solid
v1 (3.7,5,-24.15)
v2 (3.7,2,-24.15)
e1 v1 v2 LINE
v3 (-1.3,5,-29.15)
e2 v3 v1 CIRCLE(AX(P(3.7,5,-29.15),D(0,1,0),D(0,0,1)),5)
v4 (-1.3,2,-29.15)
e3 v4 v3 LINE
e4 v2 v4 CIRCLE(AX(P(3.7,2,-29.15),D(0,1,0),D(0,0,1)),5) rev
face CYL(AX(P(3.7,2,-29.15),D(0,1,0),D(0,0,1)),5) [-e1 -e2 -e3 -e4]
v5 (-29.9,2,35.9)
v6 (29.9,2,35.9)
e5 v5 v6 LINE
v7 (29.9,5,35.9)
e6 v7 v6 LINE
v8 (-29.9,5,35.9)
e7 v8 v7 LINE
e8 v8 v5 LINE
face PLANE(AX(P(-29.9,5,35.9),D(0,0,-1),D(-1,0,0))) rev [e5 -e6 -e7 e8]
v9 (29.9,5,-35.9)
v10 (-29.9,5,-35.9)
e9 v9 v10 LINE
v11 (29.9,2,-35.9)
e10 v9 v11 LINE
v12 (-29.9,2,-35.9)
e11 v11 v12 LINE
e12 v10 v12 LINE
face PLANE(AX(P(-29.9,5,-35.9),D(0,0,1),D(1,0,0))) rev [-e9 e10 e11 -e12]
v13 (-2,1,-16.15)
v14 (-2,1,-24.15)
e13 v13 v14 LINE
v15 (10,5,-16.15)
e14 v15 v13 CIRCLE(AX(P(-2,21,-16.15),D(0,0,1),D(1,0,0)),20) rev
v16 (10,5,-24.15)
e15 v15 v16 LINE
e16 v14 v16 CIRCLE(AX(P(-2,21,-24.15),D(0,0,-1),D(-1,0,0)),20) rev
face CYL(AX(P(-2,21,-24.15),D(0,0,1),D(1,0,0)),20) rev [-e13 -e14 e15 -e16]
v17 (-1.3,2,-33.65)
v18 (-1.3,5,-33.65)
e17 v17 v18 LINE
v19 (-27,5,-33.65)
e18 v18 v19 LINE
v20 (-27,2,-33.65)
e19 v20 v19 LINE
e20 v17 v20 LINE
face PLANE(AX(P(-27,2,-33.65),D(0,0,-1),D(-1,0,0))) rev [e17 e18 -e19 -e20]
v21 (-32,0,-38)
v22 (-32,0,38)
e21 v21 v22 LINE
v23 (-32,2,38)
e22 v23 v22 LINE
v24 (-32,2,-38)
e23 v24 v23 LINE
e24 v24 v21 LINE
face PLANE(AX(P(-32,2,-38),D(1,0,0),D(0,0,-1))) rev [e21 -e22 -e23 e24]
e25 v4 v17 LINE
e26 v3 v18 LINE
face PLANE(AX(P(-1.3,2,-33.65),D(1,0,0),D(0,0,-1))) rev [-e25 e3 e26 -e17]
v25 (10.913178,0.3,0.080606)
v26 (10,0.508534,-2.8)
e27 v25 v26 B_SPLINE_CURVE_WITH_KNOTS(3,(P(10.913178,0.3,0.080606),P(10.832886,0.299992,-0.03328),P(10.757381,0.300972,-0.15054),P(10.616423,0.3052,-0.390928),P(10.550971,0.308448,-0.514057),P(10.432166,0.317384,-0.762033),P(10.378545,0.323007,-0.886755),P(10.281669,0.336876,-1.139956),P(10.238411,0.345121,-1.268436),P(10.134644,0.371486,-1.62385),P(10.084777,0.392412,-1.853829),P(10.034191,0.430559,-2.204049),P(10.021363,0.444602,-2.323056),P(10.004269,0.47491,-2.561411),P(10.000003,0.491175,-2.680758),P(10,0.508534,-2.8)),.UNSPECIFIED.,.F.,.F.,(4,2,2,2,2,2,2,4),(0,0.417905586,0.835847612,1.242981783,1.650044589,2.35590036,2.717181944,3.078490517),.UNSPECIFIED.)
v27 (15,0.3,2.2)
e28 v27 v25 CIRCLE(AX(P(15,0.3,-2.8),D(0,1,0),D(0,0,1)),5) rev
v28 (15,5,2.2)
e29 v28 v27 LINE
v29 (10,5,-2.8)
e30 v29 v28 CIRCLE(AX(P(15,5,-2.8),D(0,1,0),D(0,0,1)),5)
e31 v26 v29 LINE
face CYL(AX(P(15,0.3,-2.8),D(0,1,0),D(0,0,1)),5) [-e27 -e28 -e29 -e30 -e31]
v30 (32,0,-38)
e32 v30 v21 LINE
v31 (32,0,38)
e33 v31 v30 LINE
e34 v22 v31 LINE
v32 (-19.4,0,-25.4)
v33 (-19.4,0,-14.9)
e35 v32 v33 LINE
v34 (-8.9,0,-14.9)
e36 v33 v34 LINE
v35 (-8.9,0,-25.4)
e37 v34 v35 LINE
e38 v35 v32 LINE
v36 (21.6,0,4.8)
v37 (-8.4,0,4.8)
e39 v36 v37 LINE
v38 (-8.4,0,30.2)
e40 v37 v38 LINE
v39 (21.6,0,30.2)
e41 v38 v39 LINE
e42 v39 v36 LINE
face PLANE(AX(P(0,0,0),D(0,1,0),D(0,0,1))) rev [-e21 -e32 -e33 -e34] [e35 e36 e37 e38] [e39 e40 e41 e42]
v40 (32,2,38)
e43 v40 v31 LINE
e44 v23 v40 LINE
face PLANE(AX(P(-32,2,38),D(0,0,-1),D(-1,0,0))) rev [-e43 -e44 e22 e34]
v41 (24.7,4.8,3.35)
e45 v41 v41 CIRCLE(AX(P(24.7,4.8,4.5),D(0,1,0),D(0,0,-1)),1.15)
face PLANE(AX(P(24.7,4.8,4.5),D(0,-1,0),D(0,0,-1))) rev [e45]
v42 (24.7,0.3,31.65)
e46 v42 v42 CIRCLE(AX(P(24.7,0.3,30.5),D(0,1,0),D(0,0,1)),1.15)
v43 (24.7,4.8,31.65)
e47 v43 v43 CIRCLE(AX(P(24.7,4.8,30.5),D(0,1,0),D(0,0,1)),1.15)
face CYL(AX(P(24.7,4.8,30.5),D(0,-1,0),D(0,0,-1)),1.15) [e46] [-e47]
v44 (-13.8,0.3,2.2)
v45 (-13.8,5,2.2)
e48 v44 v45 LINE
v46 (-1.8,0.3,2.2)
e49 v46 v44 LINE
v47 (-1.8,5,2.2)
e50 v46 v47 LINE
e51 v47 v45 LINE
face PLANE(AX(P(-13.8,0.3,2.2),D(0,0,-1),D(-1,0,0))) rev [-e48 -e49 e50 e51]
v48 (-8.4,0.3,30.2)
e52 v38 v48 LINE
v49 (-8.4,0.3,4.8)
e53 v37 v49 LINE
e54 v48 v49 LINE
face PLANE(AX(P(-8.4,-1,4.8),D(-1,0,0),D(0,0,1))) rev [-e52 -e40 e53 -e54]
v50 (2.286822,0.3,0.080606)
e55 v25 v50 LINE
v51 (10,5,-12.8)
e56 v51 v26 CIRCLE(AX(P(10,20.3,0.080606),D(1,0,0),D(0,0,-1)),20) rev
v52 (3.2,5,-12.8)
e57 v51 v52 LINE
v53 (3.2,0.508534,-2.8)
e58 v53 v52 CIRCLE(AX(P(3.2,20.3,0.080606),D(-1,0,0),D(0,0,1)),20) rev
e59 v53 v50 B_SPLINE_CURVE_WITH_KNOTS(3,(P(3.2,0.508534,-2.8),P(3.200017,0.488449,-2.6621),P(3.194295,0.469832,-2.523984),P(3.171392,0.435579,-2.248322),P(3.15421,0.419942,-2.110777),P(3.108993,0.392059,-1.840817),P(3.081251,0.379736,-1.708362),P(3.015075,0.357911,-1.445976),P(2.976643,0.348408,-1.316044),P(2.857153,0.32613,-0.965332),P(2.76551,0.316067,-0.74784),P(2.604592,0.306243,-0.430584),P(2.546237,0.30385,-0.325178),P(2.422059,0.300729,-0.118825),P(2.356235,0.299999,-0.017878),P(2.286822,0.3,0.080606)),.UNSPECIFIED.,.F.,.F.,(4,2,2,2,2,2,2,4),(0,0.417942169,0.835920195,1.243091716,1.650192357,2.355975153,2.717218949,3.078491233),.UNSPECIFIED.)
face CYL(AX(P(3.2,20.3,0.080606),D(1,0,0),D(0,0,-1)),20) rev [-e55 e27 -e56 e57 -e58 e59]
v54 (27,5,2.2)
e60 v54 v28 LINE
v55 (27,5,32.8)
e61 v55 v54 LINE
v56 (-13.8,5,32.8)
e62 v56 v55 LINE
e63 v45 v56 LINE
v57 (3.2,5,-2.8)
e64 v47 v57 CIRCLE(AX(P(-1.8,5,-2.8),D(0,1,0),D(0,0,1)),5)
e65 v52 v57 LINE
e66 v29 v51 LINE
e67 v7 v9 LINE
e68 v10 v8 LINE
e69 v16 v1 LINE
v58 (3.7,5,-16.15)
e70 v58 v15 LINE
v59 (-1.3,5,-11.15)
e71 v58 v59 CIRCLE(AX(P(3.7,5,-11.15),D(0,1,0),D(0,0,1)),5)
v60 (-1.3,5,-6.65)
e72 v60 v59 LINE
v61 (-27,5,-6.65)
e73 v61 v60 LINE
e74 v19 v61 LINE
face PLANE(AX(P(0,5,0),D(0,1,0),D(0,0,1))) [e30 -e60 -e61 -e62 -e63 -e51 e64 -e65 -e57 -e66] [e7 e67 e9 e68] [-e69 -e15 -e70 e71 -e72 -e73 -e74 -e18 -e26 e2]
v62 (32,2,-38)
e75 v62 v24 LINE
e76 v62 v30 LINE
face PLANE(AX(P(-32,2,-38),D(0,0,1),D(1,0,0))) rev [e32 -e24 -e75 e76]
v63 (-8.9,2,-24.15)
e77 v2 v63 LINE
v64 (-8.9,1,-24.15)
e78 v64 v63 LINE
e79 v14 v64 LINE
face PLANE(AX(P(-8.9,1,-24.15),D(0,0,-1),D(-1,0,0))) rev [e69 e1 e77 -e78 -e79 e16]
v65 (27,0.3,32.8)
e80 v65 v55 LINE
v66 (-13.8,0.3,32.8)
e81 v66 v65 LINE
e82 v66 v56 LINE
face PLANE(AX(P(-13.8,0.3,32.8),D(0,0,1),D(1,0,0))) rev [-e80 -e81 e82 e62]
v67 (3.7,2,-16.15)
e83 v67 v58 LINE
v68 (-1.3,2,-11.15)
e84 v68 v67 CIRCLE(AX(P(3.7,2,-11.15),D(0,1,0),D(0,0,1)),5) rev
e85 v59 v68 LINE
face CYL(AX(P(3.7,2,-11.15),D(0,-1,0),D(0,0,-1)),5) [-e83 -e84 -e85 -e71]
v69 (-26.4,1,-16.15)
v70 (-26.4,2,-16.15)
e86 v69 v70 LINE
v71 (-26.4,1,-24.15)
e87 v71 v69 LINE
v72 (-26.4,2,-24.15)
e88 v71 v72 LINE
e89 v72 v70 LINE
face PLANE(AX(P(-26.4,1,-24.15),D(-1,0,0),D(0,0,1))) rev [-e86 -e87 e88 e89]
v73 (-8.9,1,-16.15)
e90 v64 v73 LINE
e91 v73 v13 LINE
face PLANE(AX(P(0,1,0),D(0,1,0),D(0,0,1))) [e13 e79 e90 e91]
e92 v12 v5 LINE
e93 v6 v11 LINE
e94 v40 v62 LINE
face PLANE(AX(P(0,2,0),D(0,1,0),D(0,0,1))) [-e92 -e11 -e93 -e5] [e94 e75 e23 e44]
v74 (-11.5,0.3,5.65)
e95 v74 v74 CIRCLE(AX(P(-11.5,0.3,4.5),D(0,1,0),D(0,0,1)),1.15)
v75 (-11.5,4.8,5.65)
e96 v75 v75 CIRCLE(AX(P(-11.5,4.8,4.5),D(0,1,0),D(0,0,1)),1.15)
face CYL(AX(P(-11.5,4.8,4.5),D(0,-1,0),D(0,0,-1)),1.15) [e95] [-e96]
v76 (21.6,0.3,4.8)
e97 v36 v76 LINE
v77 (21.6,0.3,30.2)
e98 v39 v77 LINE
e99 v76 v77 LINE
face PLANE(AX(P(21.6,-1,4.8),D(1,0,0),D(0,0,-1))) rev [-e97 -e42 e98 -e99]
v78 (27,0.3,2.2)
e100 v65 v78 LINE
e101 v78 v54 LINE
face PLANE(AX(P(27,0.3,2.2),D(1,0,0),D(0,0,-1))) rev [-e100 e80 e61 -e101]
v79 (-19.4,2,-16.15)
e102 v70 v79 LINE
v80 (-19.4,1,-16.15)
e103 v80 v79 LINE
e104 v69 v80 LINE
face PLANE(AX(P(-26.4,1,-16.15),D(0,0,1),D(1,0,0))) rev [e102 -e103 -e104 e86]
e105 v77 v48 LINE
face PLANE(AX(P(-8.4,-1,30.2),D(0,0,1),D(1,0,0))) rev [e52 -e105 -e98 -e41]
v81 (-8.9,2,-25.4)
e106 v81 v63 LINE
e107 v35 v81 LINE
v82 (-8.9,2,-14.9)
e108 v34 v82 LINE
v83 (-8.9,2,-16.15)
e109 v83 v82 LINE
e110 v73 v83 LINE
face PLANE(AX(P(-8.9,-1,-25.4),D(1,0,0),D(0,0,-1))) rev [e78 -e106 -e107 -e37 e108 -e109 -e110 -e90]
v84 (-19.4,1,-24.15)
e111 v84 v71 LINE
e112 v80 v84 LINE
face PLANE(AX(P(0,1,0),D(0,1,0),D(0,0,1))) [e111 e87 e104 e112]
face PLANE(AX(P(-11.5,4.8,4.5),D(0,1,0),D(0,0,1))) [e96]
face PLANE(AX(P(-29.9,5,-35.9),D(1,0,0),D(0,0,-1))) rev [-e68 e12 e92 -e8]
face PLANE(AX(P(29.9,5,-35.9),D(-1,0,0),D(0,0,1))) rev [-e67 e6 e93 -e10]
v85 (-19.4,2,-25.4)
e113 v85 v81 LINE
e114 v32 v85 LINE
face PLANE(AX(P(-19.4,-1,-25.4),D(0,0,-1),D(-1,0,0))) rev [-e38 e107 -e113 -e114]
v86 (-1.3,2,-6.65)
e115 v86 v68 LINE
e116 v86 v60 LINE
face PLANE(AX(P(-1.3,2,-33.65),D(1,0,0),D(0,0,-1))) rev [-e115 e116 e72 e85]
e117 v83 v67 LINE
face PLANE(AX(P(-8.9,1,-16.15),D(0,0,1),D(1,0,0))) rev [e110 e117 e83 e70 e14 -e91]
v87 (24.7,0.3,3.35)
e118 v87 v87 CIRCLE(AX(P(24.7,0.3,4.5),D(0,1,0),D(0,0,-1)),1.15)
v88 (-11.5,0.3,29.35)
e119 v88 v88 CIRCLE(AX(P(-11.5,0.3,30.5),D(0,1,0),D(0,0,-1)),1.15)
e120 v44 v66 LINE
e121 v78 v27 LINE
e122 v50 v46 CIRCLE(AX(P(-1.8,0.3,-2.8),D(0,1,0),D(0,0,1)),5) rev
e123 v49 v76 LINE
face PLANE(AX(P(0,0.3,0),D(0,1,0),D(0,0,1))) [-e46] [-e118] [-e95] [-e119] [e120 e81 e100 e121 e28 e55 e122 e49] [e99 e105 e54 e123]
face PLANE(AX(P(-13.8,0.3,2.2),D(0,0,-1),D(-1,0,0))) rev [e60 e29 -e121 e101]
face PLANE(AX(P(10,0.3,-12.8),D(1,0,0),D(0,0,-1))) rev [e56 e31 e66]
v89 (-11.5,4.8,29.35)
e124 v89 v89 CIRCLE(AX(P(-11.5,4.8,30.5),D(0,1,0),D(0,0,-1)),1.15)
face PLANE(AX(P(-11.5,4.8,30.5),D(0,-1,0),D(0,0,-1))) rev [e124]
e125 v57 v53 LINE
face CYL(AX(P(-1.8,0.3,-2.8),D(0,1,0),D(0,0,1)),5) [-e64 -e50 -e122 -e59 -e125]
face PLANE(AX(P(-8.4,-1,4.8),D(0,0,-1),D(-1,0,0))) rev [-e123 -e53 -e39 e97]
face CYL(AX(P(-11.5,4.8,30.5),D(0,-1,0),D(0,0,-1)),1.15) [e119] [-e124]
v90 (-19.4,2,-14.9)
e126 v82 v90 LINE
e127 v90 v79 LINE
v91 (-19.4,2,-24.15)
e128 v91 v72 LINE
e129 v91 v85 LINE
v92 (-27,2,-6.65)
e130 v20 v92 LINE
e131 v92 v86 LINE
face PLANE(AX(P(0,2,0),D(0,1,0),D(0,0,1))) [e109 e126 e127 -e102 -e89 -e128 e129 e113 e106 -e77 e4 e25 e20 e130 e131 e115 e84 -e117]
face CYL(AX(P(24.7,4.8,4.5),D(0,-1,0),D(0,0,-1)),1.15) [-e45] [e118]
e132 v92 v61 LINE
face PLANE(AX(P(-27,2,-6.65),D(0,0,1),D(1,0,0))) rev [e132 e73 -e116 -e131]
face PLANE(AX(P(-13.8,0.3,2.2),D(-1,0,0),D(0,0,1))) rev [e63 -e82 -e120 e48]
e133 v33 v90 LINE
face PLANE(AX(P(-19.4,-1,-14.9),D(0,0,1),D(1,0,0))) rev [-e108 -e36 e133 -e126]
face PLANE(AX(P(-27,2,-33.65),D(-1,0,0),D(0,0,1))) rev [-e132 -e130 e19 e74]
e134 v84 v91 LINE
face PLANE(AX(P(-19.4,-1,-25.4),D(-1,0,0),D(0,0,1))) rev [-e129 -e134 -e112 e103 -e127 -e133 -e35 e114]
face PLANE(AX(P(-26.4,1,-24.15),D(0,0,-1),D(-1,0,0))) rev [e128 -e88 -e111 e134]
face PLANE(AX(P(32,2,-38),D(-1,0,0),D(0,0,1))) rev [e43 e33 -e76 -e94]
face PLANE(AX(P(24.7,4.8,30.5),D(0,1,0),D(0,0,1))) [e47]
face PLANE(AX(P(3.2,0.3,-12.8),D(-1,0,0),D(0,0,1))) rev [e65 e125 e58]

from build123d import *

# Parameters (mm, degrees)
SKETCH1_W           = 64
SKETCH1_H           = 76
TOP_DEPTH           = 2
SKETCH2_W           = 59.8
SKETCH2_H           = 71.8
BOSS_EXTRUDE2_DEPTH = 3
SKETCH3_W           = 10.5
SKETCH3_H           = 10.5
CUT_EXTRUDE1_DEPTH  = 6
SKETCH10_W          = 25.7
SKETCH10_H          = 27
CUT_EXTRUDE8_DEPTH  = 3
SKETCH11_W          = 7
SKETCH11_H          = 8
CUT_EXTRUDE9_DEPTH  = 1
SKETCH6_W           = 30
SKETCH6_H           = 25.4
CUT_EXTRUDE4_DEPTH  = 6
SKETCH7_R           = 1.15
BOSS_EXTRUDE3_DEPTH = 4.7
SKETCH8_W           = 40.8
SKETCH8_H           = 30.6
CUT_EXTRUDE6_DEPTH  = 4.7
SKETCH9_W           = 6.8
SKETCH9_H           = 15
CUT_EXTRUDE7_DEPTH  = 4.7
FILLET2_R           = 20
FILLET3_START       = 0.3
FILLET3_DEPTH       = 5.7
FILLET3_START_2     = 1
FILLET3_2_DEPTH     = 11
SKETCH14_R          = 1.15
BOSS_EXTRUDE4_DEPTH = 4.5
SKETCH12_W          = 11.9
SKETCH12_H          = 8
CUT_EXTRUDE10_DEPTH = 4
FILLET4_R           = 20
FILLET5_R           = 5


with BuildPart() as part:
    # Sketch1 → Top (new body)
    with BuildSketch(Plane(origin=(0, 0, 0), x_dir=(1, 0, 0), z_dir=(0, 1, 0))):
        Rectangle(SKETCH1_W, SKETCH1_H)
    extrude(amount=TOP_DEPTH)

    # Sketch2 → Boss-Extrude2 (add)
    with BuildSketch(Plane(origin=(0, 2, 0), x_dir=(1, 0, 0), z_dir=(0, 1, 0))):
        Rectangle(SKETCH2_W, SKETCH2_H)
    extrude(amount=BOSS_EXTRUDE2_DEPTH)

    # Sketch3 → Cut-Extrude1 (cut)
    with BuildSketch(Plane(origin=(0, 5, 0), x_dir=(1, 0, 0), z_dir=(0, 1, 0))):
        with Locations((-14.15, 20.15)):
            Rectangle(SKETCH3_W, SKETCH3_H)
    extrude(amount=-CUT_EXTRUDE1_DEPTH, mode=Mode.SUBTRACT)

    # Sketch10 → Cut-Extrude8 (cut)
    with BuildSketch(Plane(origin=(0, 5, 0), x_dir=(1, 0, 0), z_dir=(0, 1, 0))):
        with Locations((-14.15, 20.15)):
            Rectangle(SKETCH10_W, SKETCH10_H)
    extrude(amount=-CUT_EXTRUDE8_DEPTH, mode=Mode.SUBTRACT)

    # Sketch11 → Cut-Extrude9 (cut)
    with BuildSketch(Plane(origin=(0, 2, 0), x_dir=(1, 0, 0), z_dir=(0, 1, 0))):
        with Locations((-22.9, 20.15)):
            Rectangle(SKETCH11_W, SKETCH11_H)
        with Locations((-5.4, 20.15)):
            Rectangle(SKETCH11_W, SKETCH11_H)
    extrude(amount=-CUT_EXTRUDE9_DEPTH, mode=Mode.SUBTRACT)

    # Sketch6 → Cut-Extrude4 (cut)
    with BuildSketch(Plane(origin=(0, 5, 0), x_dir=(1, 0, 0), z_dir=(0, 1, 0))):
        with Locations((6.6, -17.5)):
            Rectangle(SKETCH6_W, SKETCH6_H)
    extrude(amount=-CUT_EXTRUDE4_DEPTH, mode=Mode.SUBTRACT)

    # Sketch7 → Boss-Extrude3 (add)
    with BuildSketch(Plane(origin=(0, 5, 0), x_dir=(1, 0, 0), z_dir=(0, 1, 0))):
        with Locations((-11.5, -4.5)):
            Circle(SKETCH7_R)
        with Locations((-11.5, -30.5)):
            Circle(SKETCH7_R)
        with Locations((24.7, -30.5)):
            Circle(SKETCH7_R)
        with Locations((24.7, -4.5)):
            Circle(SKETCH7_R)
    extrude(amount=-BOSS_EXTRUDE3_DEPTH)

    # Sketch8 → Cut-Extrude6 (cut)
    with BuildSketch(Plane(origin=(0, 5, 0), x_dir=(1, 0, 0), z_dir=(0, 1, 0))):
        with Locations((6.6, -17.5)):
            Rectangle(SKETCH8_W, SKETCH8_H)
    extrude(amount=-CUT_EXTRUDE6_DEPTH, mode=Mode.SUBTRACT)

    # Sketch9 → Cut-Extrude7 (cut)
    with BuildSketch(Plane(origin=(0, 5, 0), x_dir=(1, 0, 0), z_dir=(0, 1, 0))):
        with Locations((6.6, 5.3)):
            Rectangle(SKETCH9_W, SKETCH9_H)
    extrude(amount=-CUT_EXTRUDE7_DEPTH, mode=Mode.SUBTRACT)

    # Fillet2
    # the kernel refuses this fillet: 20 mm, written as the material it adds along each edge
    with BuildSketch(Plane(origin=(3.2, 0.3, -12.8), x_dir=(0, 0, 1), z_dir=(1, 0, 0))) as fillet2_piece_1:
        with BuildLine():
            CenterArc((12.880605576, -20), FILLET2_R, 90, 40.093007985)
            Line((0, -4.7), (0, 0))
            Line((0, 0), (12.880605576, 0))
        make_face()
    extrude(amount=6.8)

    # Fillet3: read off the stored shape, not the designer's step
    # Fillet3 outline → Fillet3 (cut)
    with BuildSketch(Plane(origin=(0, 0, 0), x_dir=(1, 0, 0), z_dir=(0, 1, 0)).offset(FILLET3_START)):
        with BuildLine():
            ThreePointArc((15, -2.2), (11.464466094, -0.735533906), (10, 2.8))
            Line((10, 2.8), (10, -2.2))
            Line((10, -2.2), (15, -2.2))
        make_face()
        with BuildLine():
            ThreePointArc((3.2, 2.8), (1.735533906, -0.735533906), (-1.8, -2.2))
            Line((-1.8, -2.2), (3.2, -2.2))
            Line((3.2, -2.2), (3.2, 2.8))
        make_face()
    extrude(amount=FILLET3_DEPTH, mode=Mode.SUBTRACT)

    # Fillet3 2 outline → Fillet3 2 (add)
    with BuildSketch(Plane.YZ.offset(FILLET3_START_2)):
        with BuildLine():
            Line((0.3, 0.080605576), (0.3, -2.8))
            Line((0.3, -2.8), (0.508534377, -2.8))
            ThreePointArc((0.508534377, -2.8), (0.35220172, -1.363466364), (0.3, 0.080605576))
        make_face()
    extrude(amount=FILLET3_2_DEPTH)

    # Sketch14 → Boss-Extrude4 (add)
    with BuildSketch(Plane(origin=(0, 0.3, 0), x_dir=(1, 0, 0), z_dir=(0, 1, 0))):
        with Locations(Location((-11.5, -4.5, 0), (0, 0, 270))):
            Circle(SKETCH14_R)
        with Locations(Location((24.7, -4.5, 0), (0, 0, 90))):
            Circle(SKETCH14_R)
        with Locations(Location((24.7, -30.5, 0), (0, 0, 270))):
            Circle(SKETCH14_R)
        with Locations(Location((-11.5, -30.5, 0), (0, 0, 90))):
            Circle(SKETCH14_R)
    extrude(amount=BOSS_EXTRUDE4_DEPTH)

    # Sketch12 → Cut-Extrude10 (cut)
    with BuildSketch(Plane(origin=(0, 5, 0), x_dir=(1, 0, 0), z_dir=(0, 1, 0))):
        with Locations((4.05, 20.15)):
            Rectangle(SKETCH12_W, SKETCH12_H)
    extrude(amount=-CUT_EXTRUDE10_DEPTH, mode=Mode.SUBTRACT)

    # Fillet4
    # the kernel refuses this fillet: 20 mm, written as the material it adds along each edge
    with BuildSketch(Plane(origin=(10, 1, -54.15), x_dir=(-1, 0, 0), z_dir=(0, 0, 1))) as fillet4_piece_1_section:
        with BuildLine():
            CenterArc((12, -20), FILLET4_R, 90, 36.869897646)
            Line((0, -4), (0, 0))
            Line((0, 0), (12, 0))
        make_face()
    fillet4_piece_1 = extrude(amount=38, mode=Mode.PRIVATE)
    fillet4_piece_1 = split(fillet4_piece_1, bisect_by=Plane(origin=(10, 1, -35.9), z_dir=(0, 0, 1)), keep=Keep.TOP, mode=Mode.PRIVATE)
    add(fillet4_piece_1)

    # Fillet5
    fillet5_edges = [part.edges().sort_by_distance(p)[0] for p in [
        (-1.3, 3.5, -24.15),
        (-1.3, 3.5, -16.15),
    ]]
    fillet(fillet5_edges, radius=FILLET5_R)


solid = part.part
